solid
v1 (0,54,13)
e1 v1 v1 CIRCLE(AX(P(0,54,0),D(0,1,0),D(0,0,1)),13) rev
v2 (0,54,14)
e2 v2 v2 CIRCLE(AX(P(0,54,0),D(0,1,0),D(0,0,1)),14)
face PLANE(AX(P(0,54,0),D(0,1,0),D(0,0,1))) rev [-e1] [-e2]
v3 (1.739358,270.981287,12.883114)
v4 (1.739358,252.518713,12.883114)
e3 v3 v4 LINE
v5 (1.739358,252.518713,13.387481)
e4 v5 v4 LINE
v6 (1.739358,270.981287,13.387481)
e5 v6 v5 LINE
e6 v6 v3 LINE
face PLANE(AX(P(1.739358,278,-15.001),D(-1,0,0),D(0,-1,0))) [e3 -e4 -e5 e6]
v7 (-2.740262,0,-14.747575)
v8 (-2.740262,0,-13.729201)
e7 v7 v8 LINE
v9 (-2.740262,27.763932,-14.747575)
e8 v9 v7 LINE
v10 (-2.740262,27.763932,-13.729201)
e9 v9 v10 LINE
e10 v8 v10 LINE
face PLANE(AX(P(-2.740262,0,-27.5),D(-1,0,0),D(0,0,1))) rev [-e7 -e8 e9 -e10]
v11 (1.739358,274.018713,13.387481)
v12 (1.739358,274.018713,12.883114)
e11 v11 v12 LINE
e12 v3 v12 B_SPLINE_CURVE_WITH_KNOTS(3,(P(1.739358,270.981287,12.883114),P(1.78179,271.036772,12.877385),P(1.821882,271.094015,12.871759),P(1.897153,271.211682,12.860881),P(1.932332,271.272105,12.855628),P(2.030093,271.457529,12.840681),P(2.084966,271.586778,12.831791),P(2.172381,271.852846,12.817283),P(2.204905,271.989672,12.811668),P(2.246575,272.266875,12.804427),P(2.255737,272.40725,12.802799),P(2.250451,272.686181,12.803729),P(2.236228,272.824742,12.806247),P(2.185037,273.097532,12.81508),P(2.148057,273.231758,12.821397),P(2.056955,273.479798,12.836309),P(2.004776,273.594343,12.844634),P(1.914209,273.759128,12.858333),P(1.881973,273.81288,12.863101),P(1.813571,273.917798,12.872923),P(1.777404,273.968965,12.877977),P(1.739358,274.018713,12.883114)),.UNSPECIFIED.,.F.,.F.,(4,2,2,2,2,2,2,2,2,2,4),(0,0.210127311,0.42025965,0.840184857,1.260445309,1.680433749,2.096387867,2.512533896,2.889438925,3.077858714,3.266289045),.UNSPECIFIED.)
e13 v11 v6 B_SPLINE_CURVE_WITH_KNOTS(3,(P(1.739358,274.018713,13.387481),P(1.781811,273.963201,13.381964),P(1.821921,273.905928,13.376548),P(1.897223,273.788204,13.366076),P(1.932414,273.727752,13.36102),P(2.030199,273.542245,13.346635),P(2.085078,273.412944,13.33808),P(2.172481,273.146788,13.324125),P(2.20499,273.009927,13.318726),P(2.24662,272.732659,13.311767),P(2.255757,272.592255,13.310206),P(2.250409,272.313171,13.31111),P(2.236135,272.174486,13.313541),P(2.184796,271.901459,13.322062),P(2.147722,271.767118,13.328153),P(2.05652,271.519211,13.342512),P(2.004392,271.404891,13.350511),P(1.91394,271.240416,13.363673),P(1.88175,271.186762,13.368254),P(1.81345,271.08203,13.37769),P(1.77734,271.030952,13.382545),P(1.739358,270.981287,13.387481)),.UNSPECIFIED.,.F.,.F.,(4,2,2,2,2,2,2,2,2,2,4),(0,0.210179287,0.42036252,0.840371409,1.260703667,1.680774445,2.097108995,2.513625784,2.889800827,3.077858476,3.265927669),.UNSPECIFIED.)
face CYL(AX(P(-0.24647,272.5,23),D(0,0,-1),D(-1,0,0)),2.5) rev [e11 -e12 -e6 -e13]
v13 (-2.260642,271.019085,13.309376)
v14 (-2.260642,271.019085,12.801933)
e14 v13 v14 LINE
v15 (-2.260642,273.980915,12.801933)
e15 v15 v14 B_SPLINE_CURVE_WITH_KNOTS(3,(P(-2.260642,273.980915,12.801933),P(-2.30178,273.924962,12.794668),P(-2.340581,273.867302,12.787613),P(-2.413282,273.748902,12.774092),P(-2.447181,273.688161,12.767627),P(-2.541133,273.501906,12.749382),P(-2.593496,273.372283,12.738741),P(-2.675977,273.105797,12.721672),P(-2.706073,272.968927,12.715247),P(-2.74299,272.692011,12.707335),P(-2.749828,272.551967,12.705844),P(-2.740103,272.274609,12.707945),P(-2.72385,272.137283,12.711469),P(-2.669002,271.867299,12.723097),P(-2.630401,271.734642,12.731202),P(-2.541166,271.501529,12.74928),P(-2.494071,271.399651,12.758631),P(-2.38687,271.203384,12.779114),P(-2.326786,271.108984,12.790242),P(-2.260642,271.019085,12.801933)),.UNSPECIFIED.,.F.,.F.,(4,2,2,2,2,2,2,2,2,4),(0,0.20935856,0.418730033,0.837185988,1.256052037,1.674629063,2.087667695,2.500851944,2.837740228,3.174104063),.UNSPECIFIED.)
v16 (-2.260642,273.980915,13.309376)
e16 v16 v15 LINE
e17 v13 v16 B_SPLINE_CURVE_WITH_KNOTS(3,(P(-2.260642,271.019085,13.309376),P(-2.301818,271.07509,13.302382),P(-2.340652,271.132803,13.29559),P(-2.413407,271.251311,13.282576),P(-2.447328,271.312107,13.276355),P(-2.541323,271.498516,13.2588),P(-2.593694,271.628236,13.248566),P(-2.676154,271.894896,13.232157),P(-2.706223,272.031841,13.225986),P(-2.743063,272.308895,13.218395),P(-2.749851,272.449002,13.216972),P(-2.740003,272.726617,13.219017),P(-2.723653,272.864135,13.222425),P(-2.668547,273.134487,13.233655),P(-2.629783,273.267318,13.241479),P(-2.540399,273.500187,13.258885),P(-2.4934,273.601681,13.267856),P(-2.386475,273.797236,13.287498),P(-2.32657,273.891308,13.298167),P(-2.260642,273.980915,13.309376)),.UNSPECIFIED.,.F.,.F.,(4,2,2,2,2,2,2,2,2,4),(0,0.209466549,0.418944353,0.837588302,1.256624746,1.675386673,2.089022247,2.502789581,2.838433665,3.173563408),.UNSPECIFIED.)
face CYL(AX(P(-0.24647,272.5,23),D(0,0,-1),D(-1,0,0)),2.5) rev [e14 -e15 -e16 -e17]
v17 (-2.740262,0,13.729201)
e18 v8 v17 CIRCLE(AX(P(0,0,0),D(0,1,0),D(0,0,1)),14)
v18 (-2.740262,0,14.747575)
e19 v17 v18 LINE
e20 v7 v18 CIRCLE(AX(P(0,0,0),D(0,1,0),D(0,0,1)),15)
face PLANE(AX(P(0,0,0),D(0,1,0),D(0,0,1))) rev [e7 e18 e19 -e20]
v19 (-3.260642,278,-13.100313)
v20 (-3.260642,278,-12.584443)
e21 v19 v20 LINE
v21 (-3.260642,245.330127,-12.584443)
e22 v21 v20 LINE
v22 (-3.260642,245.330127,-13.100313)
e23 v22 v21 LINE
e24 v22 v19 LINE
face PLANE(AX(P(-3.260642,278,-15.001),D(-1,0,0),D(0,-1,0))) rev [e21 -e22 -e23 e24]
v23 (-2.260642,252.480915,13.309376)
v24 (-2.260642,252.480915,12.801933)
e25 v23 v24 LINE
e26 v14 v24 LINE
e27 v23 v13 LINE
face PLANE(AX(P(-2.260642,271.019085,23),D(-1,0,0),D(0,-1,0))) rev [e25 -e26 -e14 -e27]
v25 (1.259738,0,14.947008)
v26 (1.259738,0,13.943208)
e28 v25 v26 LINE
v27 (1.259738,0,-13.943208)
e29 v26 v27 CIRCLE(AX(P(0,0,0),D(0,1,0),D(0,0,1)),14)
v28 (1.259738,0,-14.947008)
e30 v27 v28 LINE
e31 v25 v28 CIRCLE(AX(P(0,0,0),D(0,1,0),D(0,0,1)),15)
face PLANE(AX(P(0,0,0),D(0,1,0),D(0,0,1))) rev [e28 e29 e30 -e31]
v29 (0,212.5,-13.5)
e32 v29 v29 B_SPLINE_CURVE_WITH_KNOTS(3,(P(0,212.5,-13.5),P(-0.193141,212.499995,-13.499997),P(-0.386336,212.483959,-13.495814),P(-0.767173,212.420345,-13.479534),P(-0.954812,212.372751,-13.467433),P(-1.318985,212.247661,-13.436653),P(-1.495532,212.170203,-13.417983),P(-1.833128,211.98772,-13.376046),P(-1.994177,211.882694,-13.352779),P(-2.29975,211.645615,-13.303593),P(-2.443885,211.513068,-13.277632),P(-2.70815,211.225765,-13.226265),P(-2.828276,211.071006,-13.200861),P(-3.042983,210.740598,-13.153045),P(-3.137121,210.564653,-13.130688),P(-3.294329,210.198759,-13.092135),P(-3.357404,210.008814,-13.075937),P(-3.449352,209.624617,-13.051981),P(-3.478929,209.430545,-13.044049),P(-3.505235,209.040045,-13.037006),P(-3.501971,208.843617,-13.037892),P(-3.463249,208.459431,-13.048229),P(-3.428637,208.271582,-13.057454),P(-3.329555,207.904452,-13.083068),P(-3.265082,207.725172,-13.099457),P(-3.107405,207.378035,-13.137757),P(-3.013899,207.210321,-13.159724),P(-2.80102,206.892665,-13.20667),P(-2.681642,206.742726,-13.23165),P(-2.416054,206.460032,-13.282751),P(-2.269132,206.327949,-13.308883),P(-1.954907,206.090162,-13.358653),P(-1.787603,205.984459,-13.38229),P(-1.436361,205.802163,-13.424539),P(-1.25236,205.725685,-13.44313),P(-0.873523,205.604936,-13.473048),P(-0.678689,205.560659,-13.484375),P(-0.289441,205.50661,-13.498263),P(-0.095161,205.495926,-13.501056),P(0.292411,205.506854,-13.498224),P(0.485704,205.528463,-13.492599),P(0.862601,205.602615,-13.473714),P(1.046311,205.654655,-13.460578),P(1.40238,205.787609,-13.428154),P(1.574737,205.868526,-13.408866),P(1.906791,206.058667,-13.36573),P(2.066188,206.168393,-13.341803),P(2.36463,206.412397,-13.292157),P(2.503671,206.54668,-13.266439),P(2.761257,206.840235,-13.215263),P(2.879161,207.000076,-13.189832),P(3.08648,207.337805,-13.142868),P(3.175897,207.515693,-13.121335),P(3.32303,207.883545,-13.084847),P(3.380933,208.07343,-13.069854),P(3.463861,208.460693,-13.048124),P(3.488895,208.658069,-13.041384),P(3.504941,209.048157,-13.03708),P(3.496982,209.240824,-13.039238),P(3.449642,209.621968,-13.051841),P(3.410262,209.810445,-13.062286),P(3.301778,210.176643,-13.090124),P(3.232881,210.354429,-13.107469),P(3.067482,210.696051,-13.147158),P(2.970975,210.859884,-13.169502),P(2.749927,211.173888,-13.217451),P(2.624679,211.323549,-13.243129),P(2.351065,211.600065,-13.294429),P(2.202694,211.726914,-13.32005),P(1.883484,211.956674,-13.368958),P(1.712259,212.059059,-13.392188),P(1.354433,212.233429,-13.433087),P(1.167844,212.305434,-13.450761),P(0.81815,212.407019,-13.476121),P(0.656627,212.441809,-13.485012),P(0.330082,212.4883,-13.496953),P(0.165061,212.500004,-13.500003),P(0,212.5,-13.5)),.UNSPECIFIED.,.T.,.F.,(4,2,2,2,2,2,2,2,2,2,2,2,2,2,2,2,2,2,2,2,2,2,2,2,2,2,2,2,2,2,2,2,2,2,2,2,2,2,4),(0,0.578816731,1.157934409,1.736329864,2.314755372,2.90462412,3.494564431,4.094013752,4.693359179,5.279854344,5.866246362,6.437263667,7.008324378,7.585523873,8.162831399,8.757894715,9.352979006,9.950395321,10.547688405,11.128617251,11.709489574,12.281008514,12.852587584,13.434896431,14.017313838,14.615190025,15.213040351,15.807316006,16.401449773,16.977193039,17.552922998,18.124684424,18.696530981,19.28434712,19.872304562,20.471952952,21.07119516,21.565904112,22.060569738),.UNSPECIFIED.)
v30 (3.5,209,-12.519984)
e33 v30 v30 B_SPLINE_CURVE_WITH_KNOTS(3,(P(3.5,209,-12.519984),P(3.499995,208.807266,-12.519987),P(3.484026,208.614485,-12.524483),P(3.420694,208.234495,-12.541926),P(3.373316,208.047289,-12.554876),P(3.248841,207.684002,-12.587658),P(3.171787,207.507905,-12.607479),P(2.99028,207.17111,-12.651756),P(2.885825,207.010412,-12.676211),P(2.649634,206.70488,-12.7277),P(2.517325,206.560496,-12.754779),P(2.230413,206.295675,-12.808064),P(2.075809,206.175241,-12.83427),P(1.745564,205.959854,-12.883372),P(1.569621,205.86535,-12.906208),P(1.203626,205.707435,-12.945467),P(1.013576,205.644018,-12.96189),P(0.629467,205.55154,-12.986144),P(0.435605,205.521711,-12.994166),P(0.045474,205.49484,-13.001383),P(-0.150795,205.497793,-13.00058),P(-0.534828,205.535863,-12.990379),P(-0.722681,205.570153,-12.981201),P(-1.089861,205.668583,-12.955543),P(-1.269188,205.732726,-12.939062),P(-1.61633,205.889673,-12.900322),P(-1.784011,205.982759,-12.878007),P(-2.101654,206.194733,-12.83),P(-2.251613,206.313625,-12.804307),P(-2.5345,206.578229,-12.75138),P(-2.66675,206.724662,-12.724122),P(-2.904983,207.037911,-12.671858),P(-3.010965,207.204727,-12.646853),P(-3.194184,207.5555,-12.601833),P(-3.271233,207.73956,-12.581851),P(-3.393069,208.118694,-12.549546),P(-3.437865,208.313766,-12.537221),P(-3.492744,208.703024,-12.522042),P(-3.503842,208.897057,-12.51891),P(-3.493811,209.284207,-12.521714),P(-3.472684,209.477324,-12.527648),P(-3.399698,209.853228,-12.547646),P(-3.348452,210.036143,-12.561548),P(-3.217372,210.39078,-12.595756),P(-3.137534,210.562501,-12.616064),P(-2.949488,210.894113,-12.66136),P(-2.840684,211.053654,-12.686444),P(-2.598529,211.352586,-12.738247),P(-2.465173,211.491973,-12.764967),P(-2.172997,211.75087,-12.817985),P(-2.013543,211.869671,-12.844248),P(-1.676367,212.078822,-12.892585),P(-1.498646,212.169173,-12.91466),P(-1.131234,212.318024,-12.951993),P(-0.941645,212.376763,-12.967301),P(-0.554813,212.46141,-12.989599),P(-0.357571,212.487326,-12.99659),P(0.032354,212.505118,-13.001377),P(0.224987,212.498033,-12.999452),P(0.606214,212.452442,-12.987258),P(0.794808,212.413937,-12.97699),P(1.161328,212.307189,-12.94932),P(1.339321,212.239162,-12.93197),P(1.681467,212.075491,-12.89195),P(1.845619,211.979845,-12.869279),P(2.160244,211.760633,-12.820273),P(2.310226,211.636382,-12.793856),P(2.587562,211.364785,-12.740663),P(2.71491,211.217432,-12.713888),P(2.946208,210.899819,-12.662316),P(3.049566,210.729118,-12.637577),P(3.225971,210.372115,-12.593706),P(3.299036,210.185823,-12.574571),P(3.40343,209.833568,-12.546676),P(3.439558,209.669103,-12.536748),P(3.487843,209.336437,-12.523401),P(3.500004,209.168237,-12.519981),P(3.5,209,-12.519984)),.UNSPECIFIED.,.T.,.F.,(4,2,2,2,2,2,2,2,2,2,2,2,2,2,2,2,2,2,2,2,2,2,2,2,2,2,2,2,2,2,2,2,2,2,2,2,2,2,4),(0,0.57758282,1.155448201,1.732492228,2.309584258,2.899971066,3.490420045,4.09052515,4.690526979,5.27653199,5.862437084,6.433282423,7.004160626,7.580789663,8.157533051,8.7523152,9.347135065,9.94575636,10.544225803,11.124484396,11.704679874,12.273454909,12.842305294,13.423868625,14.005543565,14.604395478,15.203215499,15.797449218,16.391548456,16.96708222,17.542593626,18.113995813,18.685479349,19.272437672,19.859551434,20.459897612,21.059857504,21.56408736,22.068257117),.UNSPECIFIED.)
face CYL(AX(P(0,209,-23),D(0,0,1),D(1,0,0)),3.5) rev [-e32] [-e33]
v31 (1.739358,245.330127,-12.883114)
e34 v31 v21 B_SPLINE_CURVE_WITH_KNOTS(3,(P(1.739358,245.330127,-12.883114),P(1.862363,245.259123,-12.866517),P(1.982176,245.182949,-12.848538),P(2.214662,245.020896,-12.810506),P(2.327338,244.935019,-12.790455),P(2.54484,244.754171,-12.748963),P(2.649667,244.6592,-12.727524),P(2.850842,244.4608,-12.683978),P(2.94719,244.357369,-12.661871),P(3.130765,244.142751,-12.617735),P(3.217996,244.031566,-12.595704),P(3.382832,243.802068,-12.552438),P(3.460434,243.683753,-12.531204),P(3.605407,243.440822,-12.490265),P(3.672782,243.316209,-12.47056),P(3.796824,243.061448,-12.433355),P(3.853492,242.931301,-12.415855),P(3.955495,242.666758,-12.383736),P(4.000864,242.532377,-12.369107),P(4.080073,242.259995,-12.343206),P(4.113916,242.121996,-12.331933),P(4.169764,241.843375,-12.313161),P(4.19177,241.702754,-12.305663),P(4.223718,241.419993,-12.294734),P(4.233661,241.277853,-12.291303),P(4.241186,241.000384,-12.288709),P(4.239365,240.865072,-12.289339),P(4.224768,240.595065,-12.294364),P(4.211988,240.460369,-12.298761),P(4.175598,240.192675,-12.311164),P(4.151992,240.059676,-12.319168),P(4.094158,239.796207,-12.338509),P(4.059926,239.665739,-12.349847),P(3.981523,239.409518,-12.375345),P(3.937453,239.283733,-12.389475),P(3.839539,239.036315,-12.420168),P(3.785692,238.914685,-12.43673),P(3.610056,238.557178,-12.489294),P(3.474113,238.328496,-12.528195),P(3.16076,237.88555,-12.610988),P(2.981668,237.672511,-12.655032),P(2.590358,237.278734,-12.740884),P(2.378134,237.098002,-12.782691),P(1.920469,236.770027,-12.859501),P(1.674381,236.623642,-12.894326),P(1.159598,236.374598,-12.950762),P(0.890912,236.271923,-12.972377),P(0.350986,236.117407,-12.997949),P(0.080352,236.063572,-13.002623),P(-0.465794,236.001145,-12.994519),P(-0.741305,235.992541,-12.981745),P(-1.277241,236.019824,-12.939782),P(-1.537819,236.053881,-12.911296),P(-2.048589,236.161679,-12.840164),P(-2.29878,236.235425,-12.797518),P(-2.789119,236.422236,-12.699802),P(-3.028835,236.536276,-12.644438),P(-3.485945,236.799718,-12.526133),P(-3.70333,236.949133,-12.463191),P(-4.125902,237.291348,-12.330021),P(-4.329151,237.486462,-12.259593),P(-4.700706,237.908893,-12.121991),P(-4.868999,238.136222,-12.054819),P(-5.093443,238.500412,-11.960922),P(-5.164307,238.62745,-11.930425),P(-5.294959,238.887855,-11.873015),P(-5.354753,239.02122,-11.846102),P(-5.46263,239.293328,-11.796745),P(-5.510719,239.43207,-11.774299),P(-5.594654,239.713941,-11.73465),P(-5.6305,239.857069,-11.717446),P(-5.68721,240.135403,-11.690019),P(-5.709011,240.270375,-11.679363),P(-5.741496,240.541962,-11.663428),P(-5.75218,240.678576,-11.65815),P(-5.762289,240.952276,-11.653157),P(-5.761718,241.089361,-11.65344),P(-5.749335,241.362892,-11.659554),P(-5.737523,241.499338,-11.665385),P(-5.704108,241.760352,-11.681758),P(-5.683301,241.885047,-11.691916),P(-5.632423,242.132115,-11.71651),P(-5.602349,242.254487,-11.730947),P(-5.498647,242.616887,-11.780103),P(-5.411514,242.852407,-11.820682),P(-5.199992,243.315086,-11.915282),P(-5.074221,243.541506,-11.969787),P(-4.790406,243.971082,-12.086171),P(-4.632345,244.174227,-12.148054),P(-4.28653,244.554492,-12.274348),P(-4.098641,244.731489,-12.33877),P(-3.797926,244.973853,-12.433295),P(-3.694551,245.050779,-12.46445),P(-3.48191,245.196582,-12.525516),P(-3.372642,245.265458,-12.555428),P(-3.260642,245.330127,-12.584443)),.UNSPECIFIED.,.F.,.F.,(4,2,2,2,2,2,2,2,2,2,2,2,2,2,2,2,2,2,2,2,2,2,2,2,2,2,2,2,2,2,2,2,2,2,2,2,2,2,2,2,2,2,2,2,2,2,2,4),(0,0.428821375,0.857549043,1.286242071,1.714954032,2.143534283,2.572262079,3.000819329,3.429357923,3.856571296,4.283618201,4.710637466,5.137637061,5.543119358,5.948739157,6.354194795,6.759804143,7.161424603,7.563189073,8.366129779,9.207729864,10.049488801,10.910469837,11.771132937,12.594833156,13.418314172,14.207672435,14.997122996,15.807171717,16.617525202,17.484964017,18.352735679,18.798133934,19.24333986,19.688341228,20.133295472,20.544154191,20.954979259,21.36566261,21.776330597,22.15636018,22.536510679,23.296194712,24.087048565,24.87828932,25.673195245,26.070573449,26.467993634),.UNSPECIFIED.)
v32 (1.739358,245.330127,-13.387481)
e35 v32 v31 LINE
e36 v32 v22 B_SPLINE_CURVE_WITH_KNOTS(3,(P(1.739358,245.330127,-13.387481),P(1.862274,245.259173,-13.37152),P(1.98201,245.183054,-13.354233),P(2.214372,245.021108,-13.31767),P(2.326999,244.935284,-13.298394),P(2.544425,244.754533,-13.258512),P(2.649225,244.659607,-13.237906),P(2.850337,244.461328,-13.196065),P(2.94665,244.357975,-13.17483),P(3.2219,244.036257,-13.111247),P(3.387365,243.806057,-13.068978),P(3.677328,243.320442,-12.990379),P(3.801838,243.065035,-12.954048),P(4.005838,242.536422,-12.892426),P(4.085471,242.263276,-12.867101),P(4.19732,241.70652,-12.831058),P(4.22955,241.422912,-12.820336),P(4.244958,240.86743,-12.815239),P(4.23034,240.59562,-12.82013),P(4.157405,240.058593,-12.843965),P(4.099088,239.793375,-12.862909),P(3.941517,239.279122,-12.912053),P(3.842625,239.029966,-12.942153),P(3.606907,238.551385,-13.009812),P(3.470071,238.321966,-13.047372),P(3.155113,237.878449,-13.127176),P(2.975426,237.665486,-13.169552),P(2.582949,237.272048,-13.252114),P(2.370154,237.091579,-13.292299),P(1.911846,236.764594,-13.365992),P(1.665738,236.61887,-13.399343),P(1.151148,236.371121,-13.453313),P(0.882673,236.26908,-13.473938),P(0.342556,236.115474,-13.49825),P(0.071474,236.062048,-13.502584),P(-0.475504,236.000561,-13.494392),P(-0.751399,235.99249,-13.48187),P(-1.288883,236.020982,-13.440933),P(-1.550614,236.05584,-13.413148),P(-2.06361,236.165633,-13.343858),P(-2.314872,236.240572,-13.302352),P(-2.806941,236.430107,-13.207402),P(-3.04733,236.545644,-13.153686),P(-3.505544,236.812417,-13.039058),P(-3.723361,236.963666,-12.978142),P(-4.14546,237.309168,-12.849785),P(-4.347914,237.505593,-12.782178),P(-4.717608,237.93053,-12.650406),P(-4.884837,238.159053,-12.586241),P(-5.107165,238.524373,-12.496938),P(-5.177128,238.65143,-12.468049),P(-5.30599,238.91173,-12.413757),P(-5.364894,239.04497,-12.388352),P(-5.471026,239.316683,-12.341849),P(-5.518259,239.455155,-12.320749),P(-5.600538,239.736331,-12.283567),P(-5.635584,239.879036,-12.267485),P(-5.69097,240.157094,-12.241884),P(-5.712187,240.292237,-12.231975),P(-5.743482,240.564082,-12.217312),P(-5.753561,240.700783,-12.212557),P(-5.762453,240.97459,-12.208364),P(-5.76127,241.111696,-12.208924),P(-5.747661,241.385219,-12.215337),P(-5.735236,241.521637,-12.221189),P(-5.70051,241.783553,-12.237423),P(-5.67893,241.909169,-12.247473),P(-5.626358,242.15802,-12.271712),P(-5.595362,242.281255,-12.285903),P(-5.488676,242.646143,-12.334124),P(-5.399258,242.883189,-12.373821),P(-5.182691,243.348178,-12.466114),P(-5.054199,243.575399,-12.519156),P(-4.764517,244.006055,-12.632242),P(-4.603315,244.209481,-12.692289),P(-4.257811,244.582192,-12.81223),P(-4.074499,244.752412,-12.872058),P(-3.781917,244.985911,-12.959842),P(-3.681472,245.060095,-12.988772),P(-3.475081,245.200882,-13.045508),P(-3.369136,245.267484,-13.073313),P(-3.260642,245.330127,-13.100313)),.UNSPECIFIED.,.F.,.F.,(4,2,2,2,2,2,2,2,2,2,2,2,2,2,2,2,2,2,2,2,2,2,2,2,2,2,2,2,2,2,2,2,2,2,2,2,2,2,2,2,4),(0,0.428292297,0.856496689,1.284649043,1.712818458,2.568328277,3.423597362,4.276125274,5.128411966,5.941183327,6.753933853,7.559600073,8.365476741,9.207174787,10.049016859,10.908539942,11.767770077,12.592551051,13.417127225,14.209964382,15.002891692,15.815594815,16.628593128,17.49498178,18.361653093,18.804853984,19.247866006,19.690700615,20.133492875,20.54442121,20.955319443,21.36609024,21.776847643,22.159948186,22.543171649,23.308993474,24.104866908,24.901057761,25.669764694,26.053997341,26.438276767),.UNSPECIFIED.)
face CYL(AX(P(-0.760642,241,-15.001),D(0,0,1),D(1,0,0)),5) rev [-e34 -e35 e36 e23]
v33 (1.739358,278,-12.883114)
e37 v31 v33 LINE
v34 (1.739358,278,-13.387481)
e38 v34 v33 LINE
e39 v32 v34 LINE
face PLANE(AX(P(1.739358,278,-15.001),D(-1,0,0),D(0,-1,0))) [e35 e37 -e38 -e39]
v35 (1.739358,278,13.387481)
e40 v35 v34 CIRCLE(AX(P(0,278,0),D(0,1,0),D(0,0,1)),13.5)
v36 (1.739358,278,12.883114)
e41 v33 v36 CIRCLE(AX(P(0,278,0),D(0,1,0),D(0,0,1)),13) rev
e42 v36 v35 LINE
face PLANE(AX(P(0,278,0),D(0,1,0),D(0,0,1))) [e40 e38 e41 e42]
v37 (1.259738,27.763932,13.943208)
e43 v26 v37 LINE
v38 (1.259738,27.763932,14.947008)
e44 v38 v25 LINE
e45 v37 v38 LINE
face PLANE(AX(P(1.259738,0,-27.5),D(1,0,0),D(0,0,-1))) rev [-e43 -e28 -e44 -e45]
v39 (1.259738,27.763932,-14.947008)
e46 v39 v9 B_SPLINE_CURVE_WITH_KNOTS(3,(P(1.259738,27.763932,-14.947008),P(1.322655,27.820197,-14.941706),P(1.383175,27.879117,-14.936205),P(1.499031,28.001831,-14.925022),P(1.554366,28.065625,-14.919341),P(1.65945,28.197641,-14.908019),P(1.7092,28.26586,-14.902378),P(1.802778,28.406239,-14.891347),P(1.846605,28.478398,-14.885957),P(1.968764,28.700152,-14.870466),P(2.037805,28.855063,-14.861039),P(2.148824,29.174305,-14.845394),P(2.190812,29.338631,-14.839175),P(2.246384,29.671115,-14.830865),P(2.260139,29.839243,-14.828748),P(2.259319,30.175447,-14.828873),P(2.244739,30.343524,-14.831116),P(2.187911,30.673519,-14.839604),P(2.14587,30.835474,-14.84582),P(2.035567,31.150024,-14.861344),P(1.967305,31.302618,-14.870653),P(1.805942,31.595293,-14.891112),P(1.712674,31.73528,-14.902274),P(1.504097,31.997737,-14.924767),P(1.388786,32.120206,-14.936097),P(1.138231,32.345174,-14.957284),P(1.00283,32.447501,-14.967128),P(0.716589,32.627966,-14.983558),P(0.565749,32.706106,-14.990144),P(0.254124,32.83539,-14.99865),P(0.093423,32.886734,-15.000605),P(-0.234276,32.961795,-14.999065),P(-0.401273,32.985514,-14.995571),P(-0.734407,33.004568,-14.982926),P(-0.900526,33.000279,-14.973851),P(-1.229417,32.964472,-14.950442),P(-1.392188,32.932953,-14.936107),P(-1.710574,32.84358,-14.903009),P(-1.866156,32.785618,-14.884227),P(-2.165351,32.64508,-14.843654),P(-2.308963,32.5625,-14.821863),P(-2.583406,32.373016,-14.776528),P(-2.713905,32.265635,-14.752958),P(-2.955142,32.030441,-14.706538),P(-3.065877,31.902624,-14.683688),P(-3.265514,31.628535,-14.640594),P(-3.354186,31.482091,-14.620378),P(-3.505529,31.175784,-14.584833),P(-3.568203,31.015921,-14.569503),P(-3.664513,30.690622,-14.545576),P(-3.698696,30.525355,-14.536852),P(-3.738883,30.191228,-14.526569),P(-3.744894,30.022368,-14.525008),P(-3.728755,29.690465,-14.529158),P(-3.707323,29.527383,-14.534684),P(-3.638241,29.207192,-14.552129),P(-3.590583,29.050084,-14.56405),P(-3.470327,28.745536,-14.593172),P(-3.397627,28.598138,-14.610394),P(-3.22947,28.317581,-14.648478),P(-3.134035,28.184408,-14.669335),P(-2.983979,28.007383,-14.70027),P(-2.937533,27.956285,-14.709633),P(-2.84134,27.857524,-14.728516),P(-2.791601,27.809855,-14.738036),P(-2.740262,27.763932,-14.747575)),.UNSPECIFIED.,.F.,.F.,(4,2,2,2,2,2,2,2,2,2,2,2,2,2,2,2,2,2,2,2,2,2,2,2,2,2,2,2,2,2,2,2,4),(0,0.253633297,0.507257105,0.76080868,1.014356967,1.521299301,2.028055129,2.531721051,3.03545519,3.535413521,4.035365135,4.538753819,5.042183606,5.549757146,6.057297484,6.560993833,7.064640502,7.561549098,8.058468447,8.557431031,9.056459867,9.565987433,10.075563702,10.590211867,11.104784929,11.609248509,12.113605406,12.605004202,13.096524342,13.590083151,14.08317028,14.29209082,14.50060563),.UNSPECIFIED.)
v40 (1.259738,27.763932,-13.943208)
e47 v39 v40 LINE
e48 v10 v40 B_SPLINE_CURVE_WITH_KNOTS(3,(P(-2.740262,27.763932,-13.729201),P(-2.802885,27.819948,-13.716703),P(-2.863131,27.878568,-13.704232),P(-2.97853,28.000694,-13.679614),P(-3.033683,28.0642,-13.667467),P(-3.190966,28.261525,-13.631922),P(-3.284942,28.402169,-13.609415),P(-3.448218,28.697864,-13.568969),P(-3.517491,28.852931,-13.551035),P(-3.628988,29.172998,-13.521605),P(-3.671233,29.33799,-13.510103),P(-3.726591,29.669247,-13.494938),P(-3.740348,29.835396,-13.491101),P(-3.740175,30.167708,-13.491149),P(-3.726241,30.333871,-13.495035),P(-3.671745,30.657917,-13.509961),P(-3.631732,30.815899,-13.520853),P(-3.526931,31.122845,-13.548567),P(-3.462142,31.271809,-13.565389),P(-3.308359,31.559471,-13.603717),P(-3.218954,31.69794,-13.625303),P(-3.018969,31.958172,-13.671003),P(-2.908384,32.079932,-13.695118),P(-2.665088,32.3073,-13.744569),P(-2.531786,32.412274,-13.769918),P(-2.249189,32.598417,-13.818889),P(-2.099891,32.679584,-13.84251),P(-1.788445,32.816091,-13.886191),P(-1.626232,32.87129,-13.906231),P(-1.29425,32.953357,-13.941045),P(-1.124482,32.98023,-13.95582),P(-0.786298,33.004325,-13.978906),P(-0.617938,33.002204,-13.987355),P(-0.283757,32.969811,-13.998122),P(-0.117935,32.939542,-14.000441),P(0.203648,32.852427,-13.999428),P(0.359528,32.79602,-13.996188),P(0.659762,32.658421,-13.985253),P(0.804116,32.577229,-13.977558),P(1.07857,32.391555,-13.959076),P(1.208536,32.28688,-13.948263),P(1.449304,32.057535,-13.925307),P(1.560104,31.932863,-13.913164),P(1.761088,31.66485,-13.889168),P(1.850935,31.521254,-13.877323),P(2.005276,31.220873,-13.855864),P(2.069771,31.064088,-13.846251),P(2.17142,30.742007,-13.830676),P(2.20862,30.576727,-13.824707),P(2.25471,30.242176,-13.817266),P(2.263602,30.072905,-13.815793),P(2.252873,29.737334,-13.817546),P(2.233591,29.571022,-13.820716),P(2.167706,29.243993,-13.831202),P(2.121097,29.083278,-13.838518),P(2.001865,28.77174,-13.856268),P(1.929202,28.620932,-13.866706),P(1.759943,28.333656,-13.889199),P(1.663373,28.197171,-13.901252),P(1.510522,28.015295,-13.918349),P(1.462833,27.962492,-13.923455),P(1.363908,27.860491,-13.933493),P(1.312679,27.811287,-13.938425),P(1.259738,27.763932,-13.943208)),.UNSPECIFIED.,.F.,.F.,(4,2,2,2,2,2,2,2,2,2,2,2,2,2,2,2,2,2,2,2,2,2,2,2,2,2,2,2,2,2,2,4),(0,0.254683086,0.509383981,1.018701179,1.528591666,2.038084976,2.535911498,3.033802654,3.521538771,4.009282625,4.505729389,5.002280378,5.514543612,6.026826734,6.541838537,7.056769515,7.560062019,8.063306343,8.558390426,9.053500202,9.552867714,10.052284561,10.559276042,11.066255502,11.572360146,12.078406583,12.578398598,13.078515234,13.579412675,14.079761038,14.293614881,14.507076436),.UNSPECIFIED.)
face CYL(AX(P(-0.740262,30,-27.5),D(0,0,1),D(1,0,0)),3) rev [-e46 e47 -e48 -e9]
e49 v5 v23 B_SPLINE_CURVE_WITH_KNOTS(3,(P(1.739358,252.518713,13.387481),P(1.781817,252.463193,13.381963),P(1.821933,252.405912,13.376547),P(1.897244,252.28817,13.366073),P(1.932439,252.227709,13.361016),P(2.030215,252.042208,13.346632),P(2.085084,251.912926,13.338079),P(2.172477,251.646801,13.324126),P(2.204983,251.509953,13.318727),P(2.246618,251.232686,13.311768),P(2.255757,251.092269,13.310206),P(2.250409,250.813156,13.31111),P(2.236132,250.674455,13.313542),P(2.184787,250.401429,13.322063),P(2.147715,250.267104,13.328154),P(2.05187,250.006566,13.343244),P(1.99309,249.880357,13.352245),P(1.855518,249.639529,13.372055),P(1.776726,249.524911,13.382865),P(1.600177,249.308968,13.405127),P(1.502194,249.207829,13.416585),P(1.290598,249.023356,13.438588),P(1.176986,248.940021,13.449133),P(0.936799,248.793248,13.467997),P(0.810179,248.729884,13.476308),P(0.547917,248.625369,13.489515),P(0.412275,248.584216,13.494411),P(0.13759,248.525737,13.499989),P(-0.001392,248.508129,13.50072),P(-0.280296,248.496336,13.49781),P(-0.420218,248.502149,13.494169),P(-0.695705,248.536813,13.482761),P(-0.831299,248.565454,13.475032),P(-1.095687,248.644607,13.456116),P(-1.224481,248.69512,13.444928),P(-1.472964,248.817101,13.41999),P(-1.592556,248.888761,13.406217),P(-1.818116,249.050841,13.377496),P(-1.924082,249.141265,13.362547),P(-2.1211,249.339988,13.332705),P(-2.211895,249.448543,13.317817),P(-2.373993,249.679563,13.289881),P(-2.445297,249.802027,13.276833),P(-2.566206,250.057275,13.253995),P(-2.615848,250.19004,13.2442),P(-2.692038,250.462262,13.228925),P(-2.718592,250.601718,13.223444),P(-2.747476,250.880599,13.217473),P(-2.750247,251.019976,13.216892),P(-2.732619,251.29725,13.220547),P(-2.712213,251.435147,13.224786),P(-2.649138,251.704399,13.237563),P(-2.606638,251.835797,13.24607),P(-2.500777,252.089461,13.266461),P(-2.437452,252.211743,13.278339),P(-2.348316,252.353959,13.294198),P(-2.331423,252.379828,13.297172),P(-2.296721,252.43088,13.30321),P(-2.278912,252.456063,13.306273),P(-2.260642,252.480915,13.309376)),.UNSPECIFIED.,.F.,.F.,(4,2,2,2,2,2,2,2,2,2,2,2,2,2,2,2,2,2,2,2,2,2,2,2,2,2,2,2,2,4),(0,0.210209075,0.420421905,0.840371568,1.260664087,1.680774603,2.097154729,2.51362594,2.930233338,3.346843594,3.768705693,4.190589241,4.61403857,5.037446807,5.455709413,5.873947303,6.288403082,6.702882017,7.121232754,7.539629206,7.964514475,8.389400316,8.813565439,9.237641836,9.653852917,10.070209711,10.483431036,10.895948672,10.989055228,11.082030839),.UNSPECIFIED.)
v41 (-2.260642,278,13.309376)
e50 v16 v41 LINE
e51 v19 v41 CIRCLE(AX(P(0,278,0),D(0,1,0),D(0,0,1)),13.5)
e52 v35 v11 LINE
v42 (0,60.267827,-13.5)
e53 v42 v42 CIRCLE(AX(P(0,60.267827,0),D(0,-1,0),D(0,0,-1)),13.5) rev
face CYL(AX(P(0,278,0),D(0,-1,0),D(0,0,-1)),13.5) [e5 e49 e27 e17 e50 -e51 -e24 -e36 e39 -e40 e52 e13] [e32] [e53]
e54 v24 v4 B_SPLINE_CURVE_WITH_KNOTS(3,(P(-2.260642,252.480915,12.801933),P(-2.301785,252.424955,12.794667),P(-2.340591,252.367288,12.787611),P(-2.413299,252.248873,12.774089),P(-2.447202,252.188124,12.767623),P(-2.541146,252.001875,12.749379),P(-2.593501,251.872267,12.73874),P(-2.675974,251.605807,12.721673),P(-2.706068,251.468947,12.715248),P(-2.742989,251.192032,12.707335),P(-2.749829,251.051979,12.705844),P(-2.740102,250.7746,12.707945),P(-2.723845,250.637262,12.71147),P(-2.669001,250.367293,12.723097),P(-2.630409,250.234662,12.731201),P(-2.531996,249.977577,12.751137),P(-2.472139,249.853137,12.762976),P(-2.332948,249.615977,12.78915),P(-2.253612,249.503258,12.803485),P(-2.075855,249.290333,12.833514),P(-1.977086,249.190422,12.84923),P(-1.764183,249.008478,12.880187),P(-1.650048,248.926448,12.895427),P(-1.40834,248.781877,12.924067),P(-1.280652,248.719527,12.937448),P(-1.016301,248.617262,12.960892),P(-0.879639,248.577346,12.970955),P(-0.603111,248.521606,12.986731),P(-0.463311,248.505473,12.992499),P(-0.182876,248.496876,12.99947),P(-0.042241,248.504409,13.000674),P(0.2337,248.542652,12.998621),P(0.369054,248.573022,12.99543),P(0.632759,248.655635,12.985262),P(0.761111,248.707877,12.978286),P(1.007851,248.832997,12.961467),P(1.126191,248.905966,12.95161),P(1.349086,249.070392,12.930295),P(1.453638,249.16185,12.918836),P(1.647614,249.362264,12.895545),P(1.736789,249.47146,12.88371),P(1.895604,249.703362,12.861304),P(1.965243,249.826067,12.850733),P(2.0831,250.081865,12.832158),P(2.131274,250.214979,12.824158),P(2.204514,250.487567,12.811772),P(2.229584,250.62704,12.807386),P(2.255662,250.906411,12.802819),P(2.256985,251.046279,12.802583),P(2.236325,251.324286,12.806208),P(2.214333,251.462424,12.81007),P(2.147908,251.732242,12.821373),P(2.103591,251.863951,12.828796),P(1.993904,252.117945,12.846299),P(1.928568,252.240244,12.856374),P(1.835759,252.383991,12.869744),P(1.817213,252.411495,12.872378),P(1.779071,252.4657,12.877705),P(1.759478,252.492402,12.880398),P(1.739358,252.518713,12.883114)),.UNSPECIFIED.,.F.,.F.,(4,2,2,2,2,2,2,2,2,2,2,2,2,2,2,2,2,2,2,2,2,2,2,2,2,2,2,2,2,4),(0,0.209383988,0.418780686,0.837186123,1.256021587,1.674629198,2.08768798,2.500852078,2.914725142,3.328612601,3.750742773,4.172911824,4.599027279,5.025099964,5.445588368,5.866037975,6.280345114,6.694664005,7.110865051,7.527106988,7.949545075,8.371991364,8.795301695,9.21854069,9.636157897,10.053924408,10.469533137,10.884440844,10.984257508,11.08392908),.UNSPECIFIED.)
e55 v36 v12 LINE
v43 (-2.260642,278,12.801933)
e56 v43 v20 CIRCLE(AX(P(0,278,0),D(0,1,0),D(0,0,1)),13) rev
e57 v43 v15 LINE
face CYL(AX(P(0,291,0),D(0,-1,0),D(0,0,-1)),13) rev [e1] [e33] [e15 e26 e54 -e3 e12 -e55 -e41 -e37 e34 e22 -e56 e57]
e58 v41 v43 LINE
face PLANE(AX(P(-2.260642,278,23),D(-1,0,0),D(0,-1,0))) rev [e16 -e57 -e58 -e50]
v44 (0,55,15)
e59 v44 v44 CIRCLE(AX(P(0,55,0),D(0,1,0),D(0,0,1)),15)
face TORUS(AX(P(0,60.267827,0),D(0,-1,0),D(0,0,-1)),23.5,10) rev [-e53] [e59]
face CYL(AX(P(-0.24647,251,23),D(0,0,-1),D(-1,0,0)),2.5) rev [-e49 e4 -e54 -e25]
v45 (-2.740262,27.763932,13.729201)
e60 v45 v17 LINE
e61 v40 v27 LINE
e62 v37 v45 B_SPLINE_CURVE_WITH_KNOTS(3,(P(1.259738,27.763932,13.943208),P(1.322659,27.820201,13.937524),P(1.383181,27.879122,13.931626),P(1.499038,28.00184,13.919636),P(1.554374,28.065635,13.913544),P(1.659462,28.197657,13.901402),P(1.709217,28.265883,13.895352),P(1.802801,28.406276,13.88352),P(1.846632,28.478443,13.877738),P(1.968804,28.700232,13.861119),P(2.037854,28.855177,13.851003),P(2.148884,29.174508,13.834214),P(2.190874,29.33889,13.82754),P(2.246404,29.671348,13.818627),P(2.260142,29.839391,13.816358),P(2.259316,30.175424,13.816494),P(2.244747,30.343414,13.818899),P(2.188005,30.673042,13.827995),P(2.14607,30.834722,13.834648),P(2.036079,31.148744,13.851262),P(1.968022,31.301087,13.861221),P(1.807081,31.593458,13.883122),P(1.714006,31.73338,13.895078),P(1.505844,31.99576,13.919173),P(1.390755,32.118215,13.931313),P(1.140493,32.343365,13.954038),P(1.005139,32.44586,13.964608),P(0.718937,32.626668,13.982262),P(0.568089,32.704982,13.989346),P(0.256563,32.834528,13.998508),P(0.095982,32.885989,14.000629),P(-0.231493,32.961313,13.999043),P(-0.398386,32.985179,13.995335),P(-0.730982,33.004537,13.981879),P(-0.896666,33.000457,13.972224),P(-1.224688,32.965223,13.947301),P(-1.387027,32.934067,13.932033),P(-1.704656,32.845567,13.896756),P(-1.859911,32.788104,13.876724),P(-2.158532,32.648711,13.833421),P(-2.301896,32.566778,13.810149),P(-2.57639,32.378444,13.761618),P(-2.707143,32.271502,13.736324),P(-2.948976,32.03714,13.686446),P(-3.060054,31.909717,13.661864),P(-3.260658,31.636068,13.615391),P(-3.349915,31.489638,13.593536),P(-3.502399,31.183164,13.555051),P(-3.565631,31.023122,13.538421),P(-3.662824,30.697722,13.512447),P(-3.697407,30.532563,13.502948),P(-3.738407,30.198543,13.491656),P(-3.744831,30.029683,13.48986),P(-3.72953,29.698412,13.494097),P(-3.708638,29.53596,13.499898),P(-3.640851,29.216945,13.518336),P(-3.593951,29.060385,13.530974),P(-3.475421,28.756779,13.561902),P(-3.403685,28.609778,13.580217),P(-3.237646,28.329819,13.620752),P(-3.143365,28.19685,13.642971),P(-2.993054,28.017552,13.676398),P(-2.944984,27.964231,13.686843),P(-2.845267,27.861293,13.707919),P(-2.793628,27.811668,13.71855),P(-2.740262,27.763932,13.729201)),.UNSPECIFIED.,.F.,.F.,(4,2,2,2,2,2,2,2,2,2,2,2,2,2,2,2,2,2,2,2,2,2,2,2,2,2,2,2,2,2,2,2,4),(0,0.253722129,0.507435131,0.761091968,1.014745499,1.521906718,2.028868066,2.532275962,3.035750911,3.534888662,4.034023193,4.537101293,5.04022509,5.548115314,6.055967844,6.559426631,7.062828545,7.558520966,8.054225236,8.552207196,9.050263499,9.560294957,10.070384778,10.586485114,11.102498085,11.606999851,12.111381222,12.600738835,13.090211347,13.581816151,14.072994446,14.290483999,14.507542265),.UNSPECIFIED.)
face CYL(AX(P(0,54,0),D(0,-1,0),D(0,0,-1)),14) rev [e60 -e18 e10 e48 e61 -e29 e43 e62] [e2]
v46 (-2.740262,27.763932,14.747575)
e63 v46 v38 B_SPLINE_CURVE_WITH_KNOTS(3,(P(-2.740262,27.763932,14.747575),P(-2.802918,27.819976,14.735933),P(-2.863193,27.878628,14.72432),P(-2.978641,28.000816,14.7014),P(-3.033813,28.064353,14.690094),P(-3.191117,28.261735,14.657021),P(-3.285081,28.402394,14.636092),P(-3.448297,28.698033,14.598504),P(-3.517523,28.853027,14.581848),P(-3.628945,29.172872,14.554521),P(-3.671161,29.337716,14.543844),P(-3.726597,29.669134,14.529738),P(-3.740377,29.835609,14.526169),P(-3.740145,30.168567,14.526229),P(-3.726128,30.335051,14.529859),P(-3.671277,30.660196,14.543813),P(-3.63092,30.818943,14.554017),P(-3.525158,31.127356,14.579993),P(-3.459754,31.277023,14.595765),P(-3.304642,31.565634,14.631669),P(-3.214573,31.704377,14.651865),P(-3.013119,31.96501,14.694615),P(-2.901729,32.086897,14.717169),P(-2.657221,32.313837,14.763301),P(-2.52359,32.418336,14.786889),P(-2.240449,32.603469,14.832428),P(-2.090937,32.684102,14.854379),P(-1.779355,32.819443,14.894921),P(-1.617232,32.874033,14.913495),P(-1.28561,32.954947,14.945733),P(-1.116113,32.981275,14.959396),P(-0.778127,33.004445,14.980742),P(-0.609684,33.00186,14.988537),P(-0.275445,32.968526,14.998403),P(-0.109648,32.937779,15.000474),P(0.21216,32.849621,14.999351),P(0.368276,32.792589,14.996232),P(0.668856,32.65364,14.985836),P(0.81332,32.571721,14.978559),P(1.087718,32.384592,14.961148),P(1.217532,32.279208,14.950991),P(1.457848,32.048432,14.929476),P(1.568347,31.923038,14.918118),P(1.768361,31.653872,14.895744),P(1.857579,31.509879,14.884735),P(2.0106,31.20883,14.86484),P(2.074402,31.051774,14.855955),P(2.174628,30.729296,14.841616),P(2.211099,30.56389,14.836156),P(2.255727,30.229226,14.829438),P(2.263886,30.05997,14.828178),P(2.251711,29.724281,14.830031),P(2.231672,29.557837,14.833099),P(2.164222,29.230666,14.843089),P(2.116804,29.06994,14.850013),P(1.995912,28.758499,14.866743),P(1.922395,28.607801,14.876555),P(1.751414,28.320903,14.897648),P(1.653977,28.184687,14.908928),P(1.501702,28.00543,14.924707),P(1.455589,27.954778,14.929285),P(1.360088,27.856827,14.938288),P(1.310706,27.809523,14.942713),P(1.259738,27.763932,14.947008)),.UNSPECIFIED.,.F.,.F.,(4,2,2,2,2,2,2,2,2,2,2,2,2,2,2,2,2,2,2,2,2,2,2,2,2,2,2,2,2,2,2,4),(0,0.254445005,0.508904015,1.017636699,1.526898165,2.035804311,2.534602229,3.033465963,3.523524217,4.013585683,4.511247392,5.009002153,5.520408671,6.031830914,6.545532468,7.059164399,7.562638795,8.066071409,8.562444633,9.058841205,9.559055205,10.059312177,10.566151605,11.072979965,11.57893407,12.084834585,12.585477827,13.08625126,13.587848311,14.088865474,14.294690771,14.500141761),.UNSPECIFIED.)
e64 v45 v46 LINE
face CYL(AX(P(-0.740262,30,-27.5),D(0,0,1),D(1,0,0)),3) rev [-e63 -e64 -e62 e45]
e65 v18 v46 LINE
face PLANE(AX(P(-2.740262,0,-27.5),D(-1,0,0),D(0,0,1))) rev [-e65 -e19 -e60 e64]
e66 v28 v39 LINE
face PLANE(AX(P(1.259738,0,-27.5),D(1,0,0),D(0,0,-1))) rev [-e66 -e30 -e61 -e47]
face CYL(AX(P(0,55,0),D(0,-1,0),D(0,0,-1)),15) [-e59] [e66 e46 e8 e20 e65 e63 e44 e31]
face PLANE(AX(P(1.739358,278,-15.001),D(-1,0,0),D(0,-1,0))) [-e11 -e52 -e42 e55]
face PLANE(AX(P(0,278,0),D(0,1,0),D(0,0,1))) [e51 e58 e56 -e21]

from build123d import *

# Parameters (mm, degrees)
CROQUIS2_R                 = 15
SALIENTE_EXTRUIR2_DEPTH    = 55
CORTAR_EXTRUIR1_DEPTH      = 27.5
CROQUIS6_R                 = 14
CORTAR_EXTRUIR3_DEPTH      = 54
CROQUIS7_R                 = 13.5
SALIENTE_EXTRUIR4_DEPTH    = 223
CORTAR_EXTRUIR5_REACH      = 280.808
CORTAR_EXTRUIR5_END_RADIUS = 13.5
CROQUIS9_R                 = 3.5
CORTAR_EXTRUIR6_DEPTH      = 23
CORTAR_EXTRUIR7_DEPTH      = 23
CROQUIS11_R                = 13
CORTAR_EXTRUIR8_DEPTH      = 291
REDONDEO1_R                = 10


with BuildPart() as part:
    # Croquis2 → Saliente-Extruir2 (new body)
    with BuildSketch(Plane(origin=(0, 0, 0), x_dir=(1, 0, 0), z_dir=(0, 1, 0))):
        with Locations(Location((0, 0, 0), (0, 0, 270))):
            Circle(CROQUIS2_R)
    extrude(amount=SALIENTE_EXTRUIR2_DEPTH)

    # Croquis3 → Cortar-Extruir1 (cut, symmetric)
    with BuildSketch(Plane.XY):
        with BuildLine():
            Line((-2.74026183, 0), (1.25973817, 0))
            Line((1.25973817, 0), (1.25973817, 27.763932023))
            ThreePointArc((1.25973817, 27.763932023), (-0.74026183, 33), (-2.74026183, 27.763932023))
            Line((-2.74026183, 27.763932023), (-2.74026183, 0))
        make_face()
    extrude(amount=CORTAR_EXTRUIR1_DEPTH, both=True, mode=Mode.SUBTRACT)

    # Croquis6 → Cortar-Extruir3 (cut)
    with BuildSketch(Plane(origin=(0, 0, 0), x_dir=(1, 0, 0), z_dir=(0, 1, 0))):
        with Locations(Location((0, 0, 0), (0, 0, 84.83746883))):
            Circle(CROQUIS6_R)
    extrude(amount=CORTAR_EXTRUIR3_DEPTH, mode=Mode.SUBTRACT)

    # Croquis7 → Saliente-Extruir4 (add)
    with BuildSketch(Plane(origin=(0, 55, 0), x_dir=(1, 0, 0), z_dir=(0, 1, 0))):
        with Locations(Location((0, 0, 0), (0, 0, 90))):
            Circle(CROQUIS7_R)
    extrude(amount=SALIENTE_EXTRUIR4_DEPTH)

    # Cortar-Extruir5: up to this cylinder (the profile starts inside it)
    cortar_extruir5_end = Plane(origin=(0, 255.043672, 0), z_dir=(0, -1, 0)) * Cylinder(CORTAR_EXTRUIR5_END_RADIUS, 589.616, mode=Mode.PRIVATE)
    # Croquis8 → Cortar-Extruir5 (cut, up to the surface)
    with BuildSketch(Plane.XY, mode=Mode.PRIVATE) as cortar_extruir5_sk1:
        with BuildLine():
            Line((1.73935776, 278), (-3.26064224, 278))
            Line((-3.26064224, 278), (-3.26064224, 245.330127019))
            ThreePointArc((-3.26064224, 245.330127019), (-0.76064224, 236), (1.73935776, 245.330127019))
            Line((1.73935776, 245.330127019), (1.73935776, 278))
        make_face()
    cortar_extruir5_tool1 = extrude(cortar_extruir5_sk1.sketch, amount=-CORTAR_EXTRUIR5_REACH, mode=Mode.PRIVATE) & cortar_extruir5_end
    add(cortar_extruir5_tool1.solids().sort_by_distance((-0.760642, 255.043672, 0))[0], mode=Mode.SUBTRACT)

    # Croquis9 → Cortar-Extruir6 (cut)
    with BuildSketch(Plane.XY):
        with Locations((0, 209)):
            Circle(CROQUIS9_R)
    extrude(amount=-CORTAR_EXTRUIR6_DEPTH, mode=Mode.SUBTRACT)

    # Croquis10 → Cortar-Extruir7 (cut)
    with BuildSketch(Plane(origin=(0, 0, 0), x_dir=(-1, 0, 0), z_dir=(0, 0, -1))):
        with BuildLine():
            Line((2.26064224, 271.01908507), (2.26064224, 252.48091493))
            ThreePointArc((2.26064224, 252.48091493), (0.22284696, 248.500111609), (-1.73935776, 252.518713023))
            Line((-1.73935776, 252.518713023), (-1.73935776, 270.981286977))
            ThreePointArc((-1.73935776, 270.981286977), (-2.253530287, 272.5), (-1.73935776, 274.018713023))
            Line((-1.73935776, 274.018713023), (-1.73935776, 278))
            Line((-1.73935776, 278), (2.26064224, 278))
            Line((2.26064224, 278), (2.26064224, 273.98091493))
            ThreePointArc((2.26064224, 273.98091493), (2.746469713, 272.5), (2.26064224, 271.01908507))
        make_face()
    extrude(amount=-CORTAR_EXTRUIR7_DEPTH, mode=Mode.SUBTRACT)

    # Croquis11 → Cortar-Extruir8 (cut)
    with BuildSketch(Plane(origin=(0, 0, 0), x_dir=(1, 0, 0), z_dir=(0, 1, 0))):
        with Locations(Location((0, 0, 0), (0, 0, 82.310952423))):
            Circle(CROQUIS11_R)
    extrude(amount=CORTAR_EXTRUIR8_DEPTH, mode=Mode.SUBTRACT)

    # Redondeo1
    # the kernel refuses this fillet: 10 mm, written as the material it adds along each edge
    with BuildSketch(Plane(origin=(0, 55, 0), x_dir=(0, 0, -1), z_dir=(1, 0, 0))) as redondeo1_piece_1:
        with BuildLine():
            CenterArc((23.5, 5.267826876), REDONDEO1_R, 180, 31.788330617)
            Line((13.5, 5.267826876), (13.3, 5.267826876))
            Line((13.3, 5.267826876), (13.3, 0))
            Line((13.3, 0), (13.5, -0.2))
            ThreePointArc((13.5, -0.2), (14.25, -0.2), (14.83, -0.105356538))
            Line((14.83, -0.105356538), (15, 0))
        make_face()
    revolve(axis=Axis((0, 55, 0), (0, 1, 0)))


solid = part.part
